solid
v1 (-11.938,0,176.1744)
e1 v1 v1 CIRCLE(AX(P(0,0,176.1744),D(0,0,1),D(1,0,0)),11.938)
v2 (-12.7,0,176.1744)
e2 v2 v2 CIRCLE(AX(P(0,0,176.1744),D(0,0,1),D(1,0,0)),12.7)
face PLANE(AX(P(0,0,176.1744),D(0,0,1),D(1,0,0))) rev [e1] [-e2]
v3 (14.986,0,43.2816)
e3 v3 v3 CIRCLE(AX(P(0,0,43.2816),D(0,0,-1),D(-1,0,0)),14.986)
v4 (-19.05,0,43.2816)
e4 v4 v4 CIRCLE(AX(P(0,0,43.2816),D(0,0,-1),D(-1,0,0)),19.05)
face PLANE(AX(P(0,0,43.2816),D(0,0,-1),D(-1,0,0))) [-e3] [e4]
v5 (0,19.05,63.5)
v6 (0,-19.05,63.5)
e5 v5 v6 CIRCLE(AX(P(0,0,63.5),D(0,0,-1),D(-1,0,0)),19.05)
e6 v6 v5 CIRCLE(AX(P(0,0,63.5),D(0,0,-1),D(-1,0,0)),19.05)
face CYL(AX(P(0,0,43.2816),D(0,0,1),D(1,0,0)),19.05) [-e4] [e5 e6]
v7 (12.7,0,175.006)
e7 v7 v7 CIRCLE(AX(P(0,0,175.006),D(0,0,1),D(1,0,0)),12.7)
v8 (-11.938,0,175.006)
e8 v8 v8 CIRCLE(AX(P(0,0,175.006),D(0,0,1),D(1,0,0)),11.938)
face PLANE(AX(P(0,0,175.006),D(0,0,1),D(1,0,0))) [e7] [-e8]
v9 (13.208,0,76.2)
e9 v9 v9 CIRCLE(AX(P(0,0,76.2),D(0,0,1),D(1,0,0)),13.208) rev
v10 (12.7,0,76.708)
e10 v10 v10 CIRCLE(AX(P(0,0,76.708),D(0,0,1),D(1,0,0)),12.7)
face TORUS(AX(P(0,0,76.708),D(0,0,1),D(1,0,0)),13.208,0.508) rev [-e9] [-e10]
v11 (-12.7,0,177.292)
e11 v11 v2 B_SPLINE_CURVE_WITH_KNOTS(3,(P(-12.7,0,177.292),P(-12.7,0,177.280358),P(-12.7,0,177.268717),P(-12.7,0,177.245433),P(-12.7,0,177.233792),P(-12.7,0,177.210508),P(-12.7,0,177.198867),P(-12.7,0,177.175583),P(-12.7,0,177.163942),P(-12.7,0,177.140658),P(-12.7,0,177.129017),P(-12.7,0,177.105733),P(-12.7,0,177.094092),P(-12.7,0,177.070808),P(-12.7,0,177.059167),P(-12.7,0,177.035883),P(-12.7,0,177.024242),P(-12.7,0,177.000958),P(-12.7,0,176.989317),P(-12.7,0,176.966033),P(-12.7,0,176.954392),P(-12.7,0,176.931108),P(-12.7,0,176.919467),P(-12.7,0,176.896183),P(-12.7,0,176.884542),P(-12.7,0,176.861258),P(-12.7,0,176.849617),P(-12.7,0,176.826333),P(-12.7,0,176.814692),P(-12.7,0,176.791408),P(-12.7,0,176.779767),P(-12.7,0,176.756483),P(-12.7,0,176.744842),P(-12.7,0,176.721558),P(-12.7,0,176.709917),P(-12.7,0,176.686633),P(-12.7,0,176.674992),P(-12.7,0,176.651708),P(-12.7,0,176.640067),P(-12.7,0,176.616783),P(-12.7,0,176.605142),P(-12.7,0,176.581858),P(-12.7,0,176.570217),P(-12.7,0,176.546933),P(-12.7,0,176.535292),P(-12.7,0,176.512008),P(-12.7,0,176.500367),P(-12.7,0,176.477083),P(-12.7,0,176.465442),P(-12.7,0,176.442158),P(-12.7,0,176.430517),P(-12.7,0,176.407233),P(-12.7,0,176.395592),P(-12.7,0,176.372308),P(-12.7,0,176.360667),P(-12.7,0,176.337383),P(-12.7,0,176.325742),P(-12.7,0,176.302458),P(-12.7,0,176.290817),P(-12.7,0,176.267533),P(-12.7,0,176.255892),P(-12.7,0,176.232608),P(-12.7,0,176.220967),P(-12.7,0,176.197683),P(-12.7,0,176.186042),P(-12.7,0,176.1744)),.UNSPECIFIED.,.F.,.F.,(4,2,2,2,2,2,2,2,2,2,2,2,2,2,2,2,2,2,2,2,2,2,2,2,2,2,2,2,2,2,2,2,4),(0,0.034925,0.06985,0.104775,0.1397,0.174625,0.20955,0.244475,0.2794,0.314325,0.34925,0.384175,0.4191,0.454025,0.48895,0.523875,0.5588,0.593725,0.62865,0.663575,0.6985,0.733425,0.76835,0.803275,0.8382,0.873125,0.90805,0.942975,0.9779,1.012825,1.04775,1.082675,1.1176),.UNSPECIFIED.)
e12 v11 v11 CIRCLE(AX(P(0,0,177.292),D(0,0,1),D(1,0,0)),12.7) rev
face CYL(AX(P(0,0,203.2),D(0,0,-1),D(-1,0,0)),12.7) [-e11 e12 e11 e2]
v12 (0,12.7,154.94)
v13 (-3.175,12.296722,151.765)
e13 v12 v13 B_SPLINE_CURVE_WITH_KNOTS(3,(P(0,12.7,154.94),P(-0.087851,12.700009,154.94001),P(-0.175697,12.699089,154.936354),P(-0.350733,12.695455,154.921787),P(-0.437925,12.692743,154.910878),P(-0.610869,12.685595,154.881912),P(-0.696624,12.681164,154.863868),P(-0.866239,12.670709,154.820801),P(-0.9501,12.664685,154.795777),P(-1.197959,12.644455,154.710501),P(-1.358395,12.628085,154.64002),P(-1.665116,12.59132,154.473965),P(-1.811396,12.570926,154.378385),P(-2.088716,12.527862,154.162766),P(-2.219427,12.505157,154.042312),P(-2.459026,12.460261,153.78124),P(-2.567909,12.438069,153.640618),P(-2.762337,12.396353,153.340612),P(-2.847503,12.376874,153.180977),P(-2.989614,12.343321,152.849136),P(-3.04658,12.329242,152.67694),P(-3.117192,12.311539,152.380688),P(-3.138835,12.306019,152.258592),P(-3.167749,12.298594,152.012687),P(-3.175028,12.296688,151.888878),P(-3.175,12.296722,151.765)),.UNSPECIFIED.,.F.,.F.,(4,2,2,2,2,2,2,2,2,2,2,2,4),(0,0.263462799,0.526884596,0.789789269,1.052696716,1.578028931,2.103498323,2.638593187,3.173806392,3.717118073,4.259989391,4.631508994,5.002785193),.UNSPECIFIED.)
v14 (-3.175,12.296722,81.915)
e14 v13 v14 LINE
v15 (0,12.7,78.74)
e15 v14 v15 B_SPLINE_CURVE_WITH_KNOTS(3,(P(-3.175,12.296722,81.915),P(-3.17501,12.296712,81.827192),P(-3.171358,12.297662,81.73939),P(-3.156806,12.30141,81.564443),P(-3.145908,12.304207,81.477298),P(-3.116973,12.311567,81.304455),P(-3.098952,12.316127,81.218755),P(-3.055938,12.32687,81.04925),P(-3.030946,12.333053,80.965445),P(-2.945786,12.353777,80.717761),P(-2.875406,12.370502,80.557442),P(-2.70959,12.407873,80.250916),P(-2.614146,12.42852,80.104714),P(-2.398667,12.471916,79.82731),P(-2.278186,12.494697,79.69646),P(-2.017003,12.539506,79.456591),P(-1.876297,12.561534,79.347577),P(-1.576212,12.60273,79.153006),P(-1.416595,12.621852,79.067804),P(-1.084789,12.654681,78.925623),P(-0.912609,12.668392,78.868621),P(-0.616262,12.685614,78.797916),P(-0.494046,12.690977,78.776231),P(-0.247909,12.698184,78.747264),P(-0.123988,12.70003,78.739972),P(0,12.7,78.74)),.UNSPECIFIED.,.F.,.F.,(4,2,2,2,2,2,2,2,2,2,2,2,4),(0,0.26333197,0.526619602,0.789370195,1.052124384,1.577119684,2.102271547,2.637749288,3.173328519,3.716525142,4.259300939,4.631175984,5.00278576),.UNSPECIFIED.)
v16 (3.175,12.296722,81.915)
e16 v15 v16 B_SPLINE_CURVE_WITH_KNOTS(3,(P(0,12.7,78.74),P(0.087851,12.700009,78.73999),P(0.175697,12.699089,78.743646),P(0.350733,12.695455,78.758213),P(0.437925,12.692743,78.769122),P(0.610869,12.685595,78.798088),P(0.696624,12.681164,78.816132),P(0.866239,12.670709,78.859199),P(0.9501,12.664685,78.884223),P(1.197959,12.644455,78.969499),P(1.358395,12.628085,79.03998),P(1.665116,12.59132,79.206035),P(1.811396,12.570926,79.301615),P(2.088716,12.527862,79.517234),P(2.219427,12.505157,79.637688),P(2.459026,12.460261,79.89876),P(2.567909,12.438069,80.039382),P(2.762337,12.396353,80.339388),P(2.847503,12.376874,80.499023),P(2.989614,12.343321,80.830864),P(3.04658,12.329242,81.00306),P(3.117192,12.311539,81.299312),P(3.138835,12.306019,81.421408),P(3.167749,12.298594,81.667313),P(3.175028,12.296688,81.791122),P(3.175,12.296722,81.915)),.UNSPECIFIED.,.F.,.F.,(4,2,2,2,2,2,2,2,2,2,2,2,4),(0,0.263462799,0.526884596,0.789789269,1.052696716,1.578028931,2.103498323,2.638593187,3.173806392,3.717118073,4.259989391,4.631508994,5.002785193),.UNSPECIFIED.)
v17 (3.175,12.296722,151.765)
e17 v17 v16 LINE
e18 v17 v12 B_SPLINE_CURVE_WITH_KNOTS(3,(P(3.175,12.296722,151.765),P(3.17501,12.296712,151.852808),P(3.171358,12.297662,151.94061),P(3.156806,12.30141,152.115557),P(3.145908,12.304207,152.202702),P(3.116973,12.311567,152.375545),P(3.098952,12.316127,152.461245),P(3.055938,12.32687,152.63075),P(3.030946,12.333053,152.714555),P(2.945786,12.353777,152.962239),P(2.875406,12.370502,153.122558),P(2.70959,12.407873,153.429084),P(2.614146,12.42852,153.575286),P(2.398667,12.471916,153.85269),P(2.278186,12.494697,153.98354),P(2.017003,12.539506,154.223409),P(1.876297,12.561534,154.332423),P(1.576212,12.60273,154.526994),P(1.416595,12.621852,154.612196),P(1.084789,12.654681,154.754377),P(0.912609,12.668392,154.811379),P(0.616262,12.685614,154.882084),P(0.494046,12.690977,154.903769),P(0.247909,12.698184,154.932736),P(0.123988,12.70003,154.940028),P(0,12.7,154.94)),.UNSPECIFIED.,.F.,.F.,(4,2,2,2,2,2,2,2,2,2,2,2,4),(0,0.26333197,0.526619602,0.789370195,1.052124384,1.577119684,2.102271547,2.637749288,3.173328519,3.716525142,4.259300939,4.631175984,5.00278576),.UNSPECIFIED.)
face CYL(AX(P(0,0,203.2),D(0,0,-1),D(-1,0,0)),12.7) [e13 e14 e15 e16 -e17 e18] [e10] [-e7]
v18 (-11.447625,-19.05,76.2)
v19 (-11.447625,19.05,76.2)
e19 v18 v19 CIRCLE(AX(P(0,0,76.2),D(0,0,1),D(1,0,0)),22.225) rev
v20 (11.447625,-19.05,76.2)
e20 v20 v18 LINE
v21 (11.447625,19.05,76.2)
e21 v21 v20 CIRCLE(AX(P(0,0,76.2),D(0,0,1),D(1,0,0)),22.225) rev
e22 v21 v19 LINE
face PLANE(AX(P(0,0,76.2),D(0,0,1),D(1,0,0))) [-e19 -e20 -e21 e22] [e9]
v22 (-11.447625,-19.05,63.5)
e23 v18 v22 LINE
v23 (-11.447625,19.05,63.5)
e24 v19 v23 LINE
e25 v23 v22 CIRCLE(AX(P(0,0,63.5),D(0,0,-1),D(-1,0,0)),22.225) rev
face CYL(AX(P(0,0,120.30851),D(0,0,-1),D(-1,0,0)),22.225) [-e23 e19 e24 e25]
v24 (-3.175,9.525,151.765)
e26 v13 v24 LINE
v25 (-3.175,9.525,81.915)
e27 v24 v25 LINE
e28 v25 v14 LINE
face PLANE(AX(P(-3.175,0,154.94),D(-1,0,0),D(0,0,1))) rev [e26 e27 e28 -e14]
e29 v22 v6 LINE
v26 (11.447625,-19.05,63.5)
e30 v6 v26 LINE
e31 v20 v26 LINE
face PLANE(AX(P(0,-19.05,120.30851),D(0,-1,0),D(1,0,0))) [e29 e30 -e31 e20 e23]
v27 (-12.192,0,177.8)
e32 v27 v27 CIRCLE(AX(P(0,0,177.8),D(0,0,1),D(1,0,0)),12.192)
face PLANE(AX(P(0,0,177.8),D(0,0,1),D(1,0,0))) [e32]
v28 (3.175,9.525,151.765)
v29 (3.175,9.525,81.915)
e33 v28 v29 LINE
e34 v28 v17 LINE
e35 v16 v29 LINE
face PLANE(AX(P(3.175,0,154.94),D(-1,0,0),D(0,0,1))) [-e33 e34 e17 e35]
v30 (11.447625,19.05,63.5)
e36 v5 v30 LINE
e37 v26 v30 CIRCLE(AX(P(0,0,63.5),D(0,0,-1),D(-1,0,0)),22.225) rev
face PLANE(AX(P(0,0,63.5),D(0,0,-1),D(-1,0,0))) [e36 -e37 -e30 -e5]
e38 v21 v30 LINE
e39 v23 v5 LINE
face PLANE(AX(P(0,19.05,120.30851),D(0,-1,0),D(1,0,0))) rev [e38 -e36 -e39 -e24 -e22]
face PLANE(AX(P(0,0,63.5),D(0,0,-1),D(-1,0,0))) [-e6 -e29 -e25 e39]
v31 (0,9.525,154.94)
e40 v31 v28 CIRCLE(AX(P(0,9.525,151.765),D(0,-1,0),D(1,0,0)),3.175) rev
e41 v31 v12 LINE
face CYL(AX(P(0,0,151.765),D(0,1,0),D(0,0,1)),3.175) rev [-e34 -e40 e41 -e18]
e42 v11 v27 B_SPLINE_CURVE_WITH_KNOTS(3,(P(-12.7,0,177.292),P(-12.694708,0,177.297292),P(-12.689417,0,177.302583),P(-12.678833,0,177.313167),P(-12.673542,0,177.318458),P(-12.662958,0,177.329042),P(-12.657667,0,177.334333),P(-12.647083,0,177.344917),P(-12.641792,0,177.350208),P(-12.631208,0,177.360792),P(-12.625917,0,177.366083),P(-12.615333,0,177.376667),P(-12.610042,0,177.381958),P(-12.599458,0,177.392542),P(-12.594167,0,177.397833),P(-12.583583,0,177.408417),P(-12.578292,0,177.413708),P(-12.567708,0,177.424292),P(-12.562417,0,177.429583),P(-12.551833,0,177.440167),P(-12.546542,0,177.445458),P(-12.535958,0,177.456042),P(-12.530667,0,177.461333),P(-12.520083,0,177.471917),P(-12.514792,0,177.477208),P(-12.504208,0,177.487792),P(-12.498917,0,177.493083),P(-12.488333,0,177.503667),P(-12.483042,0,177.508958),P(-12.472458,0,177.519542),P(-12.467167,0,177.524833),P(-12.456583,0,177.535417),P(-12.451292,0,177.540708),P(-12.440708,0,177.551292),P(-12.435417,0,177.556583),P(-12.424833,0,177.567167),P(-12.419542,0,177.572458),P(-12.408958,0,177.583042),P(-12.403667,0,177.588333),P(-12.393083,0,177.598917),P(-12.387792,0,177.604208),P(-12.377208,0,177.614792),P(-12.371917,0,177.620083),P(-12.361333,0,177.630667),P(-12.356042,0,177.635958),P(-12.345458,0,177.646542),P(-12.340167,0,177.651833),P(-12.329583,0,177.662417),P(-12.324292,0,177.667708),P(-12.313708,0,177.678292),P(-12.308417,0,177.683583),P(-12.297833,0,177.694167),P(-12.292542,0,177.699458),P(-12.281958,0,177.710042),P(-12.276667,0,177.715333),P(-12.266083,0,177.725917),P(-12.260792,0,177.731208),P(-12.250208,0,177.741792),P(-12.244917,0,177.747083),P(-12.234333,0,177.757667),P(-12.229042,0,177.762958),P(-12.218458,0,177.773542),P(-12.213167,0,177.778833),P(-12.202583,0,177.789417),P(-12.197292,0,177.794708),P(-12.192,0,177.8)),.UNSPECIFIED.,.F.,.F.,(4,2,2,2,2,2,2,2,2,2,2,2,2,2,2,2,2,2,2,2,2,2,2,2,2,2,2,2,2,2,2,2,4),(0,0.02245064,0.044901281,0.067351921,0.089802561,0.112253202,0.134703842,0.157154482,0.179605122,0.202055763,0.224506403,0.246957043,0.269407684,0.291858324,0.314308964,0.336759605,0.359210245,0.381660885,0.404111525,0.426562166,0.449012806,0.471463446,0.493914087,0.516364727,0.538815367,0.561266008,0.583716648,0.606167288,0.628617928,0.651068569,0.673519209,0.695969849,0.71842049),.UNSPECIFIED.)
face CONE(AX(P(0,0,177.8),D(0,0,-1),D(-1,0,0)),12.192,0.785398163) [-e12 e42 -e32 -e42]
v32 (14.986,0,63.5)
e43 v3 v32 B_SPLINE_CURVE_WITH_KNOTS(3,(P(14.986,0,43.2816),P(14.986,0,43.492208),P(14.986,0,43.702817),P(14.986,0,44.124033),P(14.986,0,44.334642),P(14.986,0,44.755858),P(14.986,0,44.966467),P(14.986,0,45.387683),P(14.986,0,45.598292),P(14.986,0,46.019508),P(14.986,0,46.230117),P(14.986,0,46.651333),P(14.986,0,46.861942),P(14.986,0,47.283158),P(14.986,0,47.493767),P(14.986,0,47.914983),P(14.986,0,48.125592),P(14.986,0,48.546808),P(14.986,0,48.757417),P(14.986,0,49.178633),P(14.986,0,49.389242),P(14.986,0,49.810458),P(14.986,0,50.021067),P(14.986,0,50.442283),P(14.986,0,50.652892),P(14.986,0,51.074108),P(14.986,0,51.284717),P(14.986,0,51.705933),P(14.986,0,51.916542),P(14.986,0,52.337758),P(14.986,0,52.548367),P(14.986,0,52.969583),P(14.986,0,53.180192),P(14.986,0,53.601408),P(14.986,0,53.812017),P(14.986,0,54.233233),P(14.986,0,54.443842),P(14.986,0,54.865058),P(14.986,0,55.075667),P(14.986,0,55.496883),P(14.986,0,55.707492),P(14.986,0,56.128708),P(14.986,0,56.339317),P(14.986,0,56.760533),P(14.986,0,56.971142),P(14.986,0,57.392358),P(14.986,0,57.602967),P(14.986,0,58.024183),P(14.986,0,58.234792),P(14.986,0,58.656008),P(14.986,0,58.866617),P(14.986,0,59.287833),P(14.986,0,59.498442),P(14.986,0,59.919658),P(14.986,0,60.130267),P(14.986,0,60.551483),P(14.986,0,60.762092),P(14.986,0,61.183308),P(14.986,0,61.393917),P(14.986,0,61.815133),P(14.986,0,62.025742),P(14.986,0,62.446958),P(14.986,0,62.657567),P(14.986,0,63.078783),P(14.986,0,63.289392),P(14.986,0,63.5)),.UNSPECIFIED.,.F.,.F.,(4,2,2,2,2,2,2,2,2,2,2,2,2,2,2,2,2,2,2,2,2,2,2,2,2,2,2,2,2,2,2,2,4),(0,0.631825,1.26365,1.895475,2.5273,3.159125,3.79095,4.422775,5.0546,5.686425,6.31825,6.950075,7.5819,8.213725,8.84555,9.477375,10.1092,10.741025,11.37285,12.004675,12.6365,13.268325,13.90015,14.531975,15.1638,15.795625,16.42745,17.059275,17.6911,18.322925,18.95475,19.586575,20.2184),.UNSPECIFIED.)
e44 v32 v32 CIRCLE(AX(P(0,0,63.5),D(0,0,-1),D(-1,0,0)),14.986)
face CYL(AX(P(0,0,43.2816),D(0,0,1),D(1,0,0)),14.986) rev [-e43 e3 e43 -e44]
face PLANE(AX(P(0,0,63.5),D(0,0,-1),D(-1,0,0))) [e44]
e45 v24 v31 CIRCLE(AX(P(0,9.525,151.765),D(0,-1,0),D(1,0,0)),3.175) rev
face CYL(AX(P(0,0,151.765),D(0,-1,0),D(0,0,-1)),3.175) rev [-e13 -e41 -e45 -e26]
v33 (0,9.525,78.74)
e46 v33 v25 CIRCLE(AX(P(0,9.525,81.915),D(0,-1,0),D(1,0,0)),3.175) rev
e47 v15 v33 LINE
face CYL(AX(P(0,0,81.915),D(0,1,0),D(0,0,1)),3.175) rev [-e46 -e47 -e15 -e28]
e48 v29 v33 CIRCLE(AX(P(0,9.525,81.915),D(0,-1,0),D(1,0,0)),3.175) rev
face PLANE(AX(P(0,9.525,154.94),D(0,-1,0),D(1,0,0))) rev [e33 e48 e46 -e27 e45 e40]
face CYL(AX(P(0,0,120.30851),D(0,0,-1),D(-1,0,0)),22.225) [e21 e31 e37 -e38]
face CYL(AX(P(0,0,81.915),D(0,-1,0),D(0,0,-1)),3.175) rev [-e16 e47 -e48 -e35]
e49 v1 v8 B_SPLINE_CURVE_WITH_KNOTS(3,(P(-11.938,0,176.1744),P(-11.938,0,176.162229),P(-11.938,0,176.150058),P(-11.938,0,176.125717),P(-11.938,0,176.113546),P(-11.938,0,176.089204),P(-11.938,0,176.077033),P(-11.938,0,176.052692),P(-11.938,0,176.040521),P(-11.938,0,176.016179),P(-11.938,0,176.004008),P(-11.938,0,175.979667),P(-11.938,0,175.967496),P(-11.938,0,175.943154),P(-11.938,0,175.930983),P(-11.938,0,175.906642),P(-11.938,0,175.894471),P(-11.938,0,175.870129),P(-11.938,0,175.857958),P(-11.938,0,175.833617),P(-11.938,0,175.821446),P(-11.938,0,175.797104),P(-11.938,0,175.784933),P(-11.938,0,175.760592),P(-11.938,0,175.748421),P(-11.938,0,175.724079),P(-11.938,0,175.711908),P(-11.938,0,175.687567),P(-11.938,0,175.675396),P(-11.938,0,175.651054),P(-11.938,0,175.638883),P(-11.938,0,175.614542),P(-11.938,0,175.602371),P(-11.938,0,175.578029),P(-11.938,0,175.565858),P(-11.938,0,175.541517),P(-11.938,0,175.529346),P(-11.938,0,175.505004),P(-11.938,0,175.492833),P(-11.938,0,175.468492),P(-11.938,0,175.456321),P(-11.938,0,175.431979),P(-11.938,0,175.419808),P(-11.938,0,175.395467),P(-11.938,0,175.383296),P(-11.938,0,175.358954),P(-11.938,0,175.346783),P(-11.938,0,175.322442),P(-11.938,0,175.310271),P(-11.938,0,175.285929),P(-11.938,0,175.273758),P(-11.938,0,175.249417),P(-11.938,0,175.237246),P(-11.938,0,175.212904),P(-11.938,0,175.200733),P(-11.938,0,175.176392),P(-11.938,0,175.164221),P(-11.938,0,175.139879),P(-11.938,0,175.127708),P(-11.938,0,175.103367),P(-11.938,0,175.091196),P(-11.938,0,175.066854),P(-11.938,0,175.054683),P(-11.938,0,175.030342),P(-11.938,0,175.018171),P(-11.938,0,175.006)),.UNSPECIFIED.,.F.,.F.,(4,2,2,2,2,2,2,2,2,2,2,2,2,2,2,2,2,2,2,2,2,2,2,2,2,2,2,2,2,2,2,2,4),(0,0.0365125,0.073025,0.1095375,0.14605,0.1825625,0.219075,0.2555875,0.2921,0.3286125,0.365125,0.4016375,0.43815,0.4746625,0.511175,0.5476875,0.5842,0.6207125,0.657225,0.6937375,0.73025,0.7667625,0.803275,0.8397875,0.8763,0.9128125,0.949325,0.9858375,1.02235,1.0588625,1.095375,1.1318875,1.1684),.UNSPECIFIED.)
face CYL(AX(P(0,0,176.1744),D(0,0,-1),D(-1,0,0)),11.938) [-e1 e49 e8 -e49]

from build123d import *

# Parameters (mm, degrees)
SKETCH1_R           = 19.05
SKETCH1_R_2         = 13.9954
BOSS_EXTRUDE1_DEPTH = 63.5
SKETCH2_R           = 19.05
BOSS_EXTRUDE2_DEPTH = 12.7
SKETCH3_R           = 12.7
BOSS_EXTRUDE3_DEPTH = 127
FILLET1_R           = 0.508
CHAMFER1_SIZE       = 1.27
CUT_EXTRUDE1_DEPTH  = 76.2
FILLET2_R           = 3.175
BOSS_EXTRUDE4_DEPTH = 76.2
BOSS_EXTRUDE5_START = 63.5
SKETCH6_R           = 13.9954
BOSS_EXTRUDE5_DEPTH = 63.5
SKETCH7_R           = 25.219402827
SKETCH7_R_2         = 12.7
CUT_EXTRUDE2_DEPTH  = 63.5
SKETCH8_R           = 14.2875
CUT_EXTRUDE3_DEPTH  = 19.05
SKETCH9_W           = 6.35
SKETCH9_H           = 41.275
CUT_EXTRUDE4_DEPTH  = 25.4
FILLET3_R           = 3.175
SKETCH10_R          = 33.957183176
CUT_EXTRUDE5_DEPTH  = 44.45
SKETCH11_R          = 19.05
SKETCH11_R_2        = 14.986
BOSS_EXTRUDE6_DEPTH = 20.2184
SKETCH12_R          = 18.486840379
CUT_EXTRUDE6_DEPTH  = 25.4
SKETCH13_R          = 16.938517856
SKETCH13_R_2        = 11.938
CUT_EXTRUDE7_DEPTH  = 1.1684
CHAMFER3_SIZE       = 0.508


with BuildPart() as part:
    # Sketch1 → Boss-Extrude1 (new body)
    with BuildSketch(Plane.XY):
        Circle(SKETCH1_R)
        Circle(SKETCH1_R_2, mode=Mode.SUBTRACT)
    extrude(amount=BOSS_EXTRUDE1_DEPTH)

    # Sketch2 → Boss-Extrude2 (add)
    with BuildSketch(Plane.XY.offset(63.5)):
        Circle(SKETCH2_R)
    extrude(amount=BOSS_EXTRUDE2_DEPTH)

    # Sketch3 → Boss-Extrude3 (add)
    with BuildSketch(Plane.XY.offset(76.2)):
        Circle(SKETCH3_R)
    extrude(amount=BOSS_EXTRUDE3_DEPTH)

    # Fillet1
    fillet1_edges = [part.edges().sort_by_distance(p)[0] for p in [
        (-12.7, 0, 76.2),
    ]]
    fillet(fillet1_edges, radius=FILLET1_R)

    # Chamfer1
    chamfer1_edges = [part.edges().sort_by_distance(p)[0] for p in [
        (-12.7, 0, 203.2),
    ]]
    chamfer(chamfer1_edges, length=CHAMFER1_SIZE)

    # Sketch4 → Cut-Extrude1 (cut)
    with BuildSketch(Plane.XY.offset(78.74)):
        with BuildLine():
            Line((-3.175, 9.525), (3.175, 9.525))
            Line((3.175, 9.525), (3.175, 12.296722124))
            ThreePointArc((3.175, 12.296722124), (0, 12.7), (-3.175, 12.296722124))
            Line((-3.175, 12.296722124), (-3.175, 9.525))
        make_face()
    extrude(amount=CUT_EXTRUDE1_DEPTH, mode=Mode.SUBTRACT)

    # Fillet2
    fillet2_edges = [part.edges().sort_by_distance(p)[0] for p in [
        (3.175, 10.910861062, 154.94),
        (-3.175, 10.910861062, 154.94),
        (3.175, 10.910861062, 78.74),
        (-3.175, 10.910861062, 78.74),
    ]]
    fillet(fillet2_edges, radius=FILLET2_R - 0.0001)  # a hair under: the kernel refuses the full size

    # Sketch5 → Boss-Extrude4 (add)
    with BuildSketch(Plane(origin=(0, 0, 0), x_dir=(-1, 0, 0), z_dir=(0, 0, -1))):
        with BuildLine():
            Line((-4.6e-08, 19.05), (-11.4476253, 19.05))
            ThreePointArc((-11.4476253, 19.05), (-22.225, 0), (-11.4476253, -19.05))
            Line((-11.4476253, -19.05), (1.9e-08, -19.05))
            ThreePointArc((1.9e-08, -19.05), (-19.05, -3.2e-08), (-4.6e-08, 19.05))
        make_face()
        with BuildLine():
            Line((11.4476253, 19.05), (-4.6e-08, 19.05))
            ThreePointArc((-4.6e-08, 19.05), (13.470384166, 13.470384198), (19.05, 0))
            ThreePointArc((19.05, 0), (13.470384188, -13.470384175), (1.9e-08, -19.05))
            Line((1.9e-08, -19.05), (11.4476253, -19.05))
            ThreePointArc((11.4476253, -19.05), (19.343915029, -10.943654616), (22.225, 0))
            ThreePointArc((22.225, 0), (19.343915029, 10.943654616), (11.4476253, 19.05))
        make_face()
    extrude(amount=-BOSS_EXTRUDE4_DEPTH)

    # Sketch6 → Boss-Extrude5 (add)
    with BuildSketch(Plane(origin=(0, 0, 63.5), x_dir=(-1, 0, 0), z_dir=(0, 0, -1)).offset(BOSS_EXTRUDE5_START)):
        Circle(SKETCH6_R)
    extrude(amount=-BOSS_EXTRUDE5_DEPTH)

    # Sketch7 → Cut-Extrude2 (cut)
    with BuildSketch(Plane(origin=(0, 0, 0), x_dir=(-1, 0, 0), z_dir=(0, 0, -1))):
        Circle(SKETCH7_R)
        with Locations(Location((0, 0, 0), (0, 0, 180))):
            Circle(SKETCH7_R_2, mode=Mode.SUBTRACT)
    extrude(amount=-CUT_EXTRUDE2_DEPTH, mode=Mode.SUBTRACT)

    # Sketch8 → Cut-Extrude3 (cut)
    with BuildSketch(Plane(origin=(0, 0, 0), x_dir=(-1, 0, 0), z_dir=(0, 0, -1))):
        Circle(SKETCH8_R)
    extrude(amount=-CUT_EXTRUDE3_DEPTH, mode=Mode.SUBTRACT)

    # Sketch9 → Cut-Extrude4 (cut)
    with BuildSketch(Plane(origin=(0, 9.525, 0), x_dir=(1, 0, 0), z_dir=(0, 1, 0))):
        with Locations((0, -39.6875)):
            Rectangle(SKETCH9_W, SKETCH9_H)
    extrude(amount=CUT_EXTRUDE4_DEPTH, mode=Mode.SUBTRACT)

    # Fillet3
    fillet3_edges = [part.edges().sort_by_distance(p)[0] for p in [
        (-3.175, 10.910861062, 60.325),
        (3.175, 10.910861062, 60.325),
    ]]
    fillet(fillet3_edges, radius=FILLET3_R - 0.0001)  # a hair under: the kernel refuses the full size

    # Sketch10 → Cut-Extrude5 (cut)
    with BuildSketch(Plane(origin=(0, 0, 19.05), x_dir=(-1, 0, 0), z_dir=(0, 0, -1))):
        Circle(SKETCH10_R)
    extrude(amount=-CUT_EXTRUDE5_DEPTH, mode=Mode.SUBTRACT)

    # Sketch11 → Boss-Extrude6 (add)
    with BuildSketch(Plane(origin=(0, 0, 63.5), x_dir=(-1, 0, 0), z_dir=(0, 0, -1))):
        with Locations(Location((0, 0, 0), (0, 0, 270))):
            Circle(SKETCH11_R)
        Circle(SKETCH11_R_2, mode=Mode.SUBTRACT)
    extrude(amount=BOSS_EXTRUDE6_DEPTH)

    # Sketch12 → Cut-Extrude6 (cut)
    with BuildSketch(Plane.XY.offset(203.2)):
        Circle(SKETCH12_R)
    extrude(amount=-CUT_EXTRUDE6_DEPTH, mode=Mode.SUBTRACT)

    # Sketch13 → Cut-Extrude7 (cut)
    with BuildSketch(Plane.XY.offset(175.006)):
        Circle(SKETCH13_R)
        Circle(SKETCH13_R_2, mode=Mode.SUBTRACT)
    extrude(amount=CUT_EXTRUDE7_DEPTH, mode=Mode.SUBTRACT)

    # Chamfer3
    chamfer3_edges = [part.edges().sort_by_distance(p)[0] for p in [
        (-12.7, 0, 177.8),
    ]]
    chamfer(chamfer3_edges, length=CHAMFER3_SIZE)


solid = part.part
